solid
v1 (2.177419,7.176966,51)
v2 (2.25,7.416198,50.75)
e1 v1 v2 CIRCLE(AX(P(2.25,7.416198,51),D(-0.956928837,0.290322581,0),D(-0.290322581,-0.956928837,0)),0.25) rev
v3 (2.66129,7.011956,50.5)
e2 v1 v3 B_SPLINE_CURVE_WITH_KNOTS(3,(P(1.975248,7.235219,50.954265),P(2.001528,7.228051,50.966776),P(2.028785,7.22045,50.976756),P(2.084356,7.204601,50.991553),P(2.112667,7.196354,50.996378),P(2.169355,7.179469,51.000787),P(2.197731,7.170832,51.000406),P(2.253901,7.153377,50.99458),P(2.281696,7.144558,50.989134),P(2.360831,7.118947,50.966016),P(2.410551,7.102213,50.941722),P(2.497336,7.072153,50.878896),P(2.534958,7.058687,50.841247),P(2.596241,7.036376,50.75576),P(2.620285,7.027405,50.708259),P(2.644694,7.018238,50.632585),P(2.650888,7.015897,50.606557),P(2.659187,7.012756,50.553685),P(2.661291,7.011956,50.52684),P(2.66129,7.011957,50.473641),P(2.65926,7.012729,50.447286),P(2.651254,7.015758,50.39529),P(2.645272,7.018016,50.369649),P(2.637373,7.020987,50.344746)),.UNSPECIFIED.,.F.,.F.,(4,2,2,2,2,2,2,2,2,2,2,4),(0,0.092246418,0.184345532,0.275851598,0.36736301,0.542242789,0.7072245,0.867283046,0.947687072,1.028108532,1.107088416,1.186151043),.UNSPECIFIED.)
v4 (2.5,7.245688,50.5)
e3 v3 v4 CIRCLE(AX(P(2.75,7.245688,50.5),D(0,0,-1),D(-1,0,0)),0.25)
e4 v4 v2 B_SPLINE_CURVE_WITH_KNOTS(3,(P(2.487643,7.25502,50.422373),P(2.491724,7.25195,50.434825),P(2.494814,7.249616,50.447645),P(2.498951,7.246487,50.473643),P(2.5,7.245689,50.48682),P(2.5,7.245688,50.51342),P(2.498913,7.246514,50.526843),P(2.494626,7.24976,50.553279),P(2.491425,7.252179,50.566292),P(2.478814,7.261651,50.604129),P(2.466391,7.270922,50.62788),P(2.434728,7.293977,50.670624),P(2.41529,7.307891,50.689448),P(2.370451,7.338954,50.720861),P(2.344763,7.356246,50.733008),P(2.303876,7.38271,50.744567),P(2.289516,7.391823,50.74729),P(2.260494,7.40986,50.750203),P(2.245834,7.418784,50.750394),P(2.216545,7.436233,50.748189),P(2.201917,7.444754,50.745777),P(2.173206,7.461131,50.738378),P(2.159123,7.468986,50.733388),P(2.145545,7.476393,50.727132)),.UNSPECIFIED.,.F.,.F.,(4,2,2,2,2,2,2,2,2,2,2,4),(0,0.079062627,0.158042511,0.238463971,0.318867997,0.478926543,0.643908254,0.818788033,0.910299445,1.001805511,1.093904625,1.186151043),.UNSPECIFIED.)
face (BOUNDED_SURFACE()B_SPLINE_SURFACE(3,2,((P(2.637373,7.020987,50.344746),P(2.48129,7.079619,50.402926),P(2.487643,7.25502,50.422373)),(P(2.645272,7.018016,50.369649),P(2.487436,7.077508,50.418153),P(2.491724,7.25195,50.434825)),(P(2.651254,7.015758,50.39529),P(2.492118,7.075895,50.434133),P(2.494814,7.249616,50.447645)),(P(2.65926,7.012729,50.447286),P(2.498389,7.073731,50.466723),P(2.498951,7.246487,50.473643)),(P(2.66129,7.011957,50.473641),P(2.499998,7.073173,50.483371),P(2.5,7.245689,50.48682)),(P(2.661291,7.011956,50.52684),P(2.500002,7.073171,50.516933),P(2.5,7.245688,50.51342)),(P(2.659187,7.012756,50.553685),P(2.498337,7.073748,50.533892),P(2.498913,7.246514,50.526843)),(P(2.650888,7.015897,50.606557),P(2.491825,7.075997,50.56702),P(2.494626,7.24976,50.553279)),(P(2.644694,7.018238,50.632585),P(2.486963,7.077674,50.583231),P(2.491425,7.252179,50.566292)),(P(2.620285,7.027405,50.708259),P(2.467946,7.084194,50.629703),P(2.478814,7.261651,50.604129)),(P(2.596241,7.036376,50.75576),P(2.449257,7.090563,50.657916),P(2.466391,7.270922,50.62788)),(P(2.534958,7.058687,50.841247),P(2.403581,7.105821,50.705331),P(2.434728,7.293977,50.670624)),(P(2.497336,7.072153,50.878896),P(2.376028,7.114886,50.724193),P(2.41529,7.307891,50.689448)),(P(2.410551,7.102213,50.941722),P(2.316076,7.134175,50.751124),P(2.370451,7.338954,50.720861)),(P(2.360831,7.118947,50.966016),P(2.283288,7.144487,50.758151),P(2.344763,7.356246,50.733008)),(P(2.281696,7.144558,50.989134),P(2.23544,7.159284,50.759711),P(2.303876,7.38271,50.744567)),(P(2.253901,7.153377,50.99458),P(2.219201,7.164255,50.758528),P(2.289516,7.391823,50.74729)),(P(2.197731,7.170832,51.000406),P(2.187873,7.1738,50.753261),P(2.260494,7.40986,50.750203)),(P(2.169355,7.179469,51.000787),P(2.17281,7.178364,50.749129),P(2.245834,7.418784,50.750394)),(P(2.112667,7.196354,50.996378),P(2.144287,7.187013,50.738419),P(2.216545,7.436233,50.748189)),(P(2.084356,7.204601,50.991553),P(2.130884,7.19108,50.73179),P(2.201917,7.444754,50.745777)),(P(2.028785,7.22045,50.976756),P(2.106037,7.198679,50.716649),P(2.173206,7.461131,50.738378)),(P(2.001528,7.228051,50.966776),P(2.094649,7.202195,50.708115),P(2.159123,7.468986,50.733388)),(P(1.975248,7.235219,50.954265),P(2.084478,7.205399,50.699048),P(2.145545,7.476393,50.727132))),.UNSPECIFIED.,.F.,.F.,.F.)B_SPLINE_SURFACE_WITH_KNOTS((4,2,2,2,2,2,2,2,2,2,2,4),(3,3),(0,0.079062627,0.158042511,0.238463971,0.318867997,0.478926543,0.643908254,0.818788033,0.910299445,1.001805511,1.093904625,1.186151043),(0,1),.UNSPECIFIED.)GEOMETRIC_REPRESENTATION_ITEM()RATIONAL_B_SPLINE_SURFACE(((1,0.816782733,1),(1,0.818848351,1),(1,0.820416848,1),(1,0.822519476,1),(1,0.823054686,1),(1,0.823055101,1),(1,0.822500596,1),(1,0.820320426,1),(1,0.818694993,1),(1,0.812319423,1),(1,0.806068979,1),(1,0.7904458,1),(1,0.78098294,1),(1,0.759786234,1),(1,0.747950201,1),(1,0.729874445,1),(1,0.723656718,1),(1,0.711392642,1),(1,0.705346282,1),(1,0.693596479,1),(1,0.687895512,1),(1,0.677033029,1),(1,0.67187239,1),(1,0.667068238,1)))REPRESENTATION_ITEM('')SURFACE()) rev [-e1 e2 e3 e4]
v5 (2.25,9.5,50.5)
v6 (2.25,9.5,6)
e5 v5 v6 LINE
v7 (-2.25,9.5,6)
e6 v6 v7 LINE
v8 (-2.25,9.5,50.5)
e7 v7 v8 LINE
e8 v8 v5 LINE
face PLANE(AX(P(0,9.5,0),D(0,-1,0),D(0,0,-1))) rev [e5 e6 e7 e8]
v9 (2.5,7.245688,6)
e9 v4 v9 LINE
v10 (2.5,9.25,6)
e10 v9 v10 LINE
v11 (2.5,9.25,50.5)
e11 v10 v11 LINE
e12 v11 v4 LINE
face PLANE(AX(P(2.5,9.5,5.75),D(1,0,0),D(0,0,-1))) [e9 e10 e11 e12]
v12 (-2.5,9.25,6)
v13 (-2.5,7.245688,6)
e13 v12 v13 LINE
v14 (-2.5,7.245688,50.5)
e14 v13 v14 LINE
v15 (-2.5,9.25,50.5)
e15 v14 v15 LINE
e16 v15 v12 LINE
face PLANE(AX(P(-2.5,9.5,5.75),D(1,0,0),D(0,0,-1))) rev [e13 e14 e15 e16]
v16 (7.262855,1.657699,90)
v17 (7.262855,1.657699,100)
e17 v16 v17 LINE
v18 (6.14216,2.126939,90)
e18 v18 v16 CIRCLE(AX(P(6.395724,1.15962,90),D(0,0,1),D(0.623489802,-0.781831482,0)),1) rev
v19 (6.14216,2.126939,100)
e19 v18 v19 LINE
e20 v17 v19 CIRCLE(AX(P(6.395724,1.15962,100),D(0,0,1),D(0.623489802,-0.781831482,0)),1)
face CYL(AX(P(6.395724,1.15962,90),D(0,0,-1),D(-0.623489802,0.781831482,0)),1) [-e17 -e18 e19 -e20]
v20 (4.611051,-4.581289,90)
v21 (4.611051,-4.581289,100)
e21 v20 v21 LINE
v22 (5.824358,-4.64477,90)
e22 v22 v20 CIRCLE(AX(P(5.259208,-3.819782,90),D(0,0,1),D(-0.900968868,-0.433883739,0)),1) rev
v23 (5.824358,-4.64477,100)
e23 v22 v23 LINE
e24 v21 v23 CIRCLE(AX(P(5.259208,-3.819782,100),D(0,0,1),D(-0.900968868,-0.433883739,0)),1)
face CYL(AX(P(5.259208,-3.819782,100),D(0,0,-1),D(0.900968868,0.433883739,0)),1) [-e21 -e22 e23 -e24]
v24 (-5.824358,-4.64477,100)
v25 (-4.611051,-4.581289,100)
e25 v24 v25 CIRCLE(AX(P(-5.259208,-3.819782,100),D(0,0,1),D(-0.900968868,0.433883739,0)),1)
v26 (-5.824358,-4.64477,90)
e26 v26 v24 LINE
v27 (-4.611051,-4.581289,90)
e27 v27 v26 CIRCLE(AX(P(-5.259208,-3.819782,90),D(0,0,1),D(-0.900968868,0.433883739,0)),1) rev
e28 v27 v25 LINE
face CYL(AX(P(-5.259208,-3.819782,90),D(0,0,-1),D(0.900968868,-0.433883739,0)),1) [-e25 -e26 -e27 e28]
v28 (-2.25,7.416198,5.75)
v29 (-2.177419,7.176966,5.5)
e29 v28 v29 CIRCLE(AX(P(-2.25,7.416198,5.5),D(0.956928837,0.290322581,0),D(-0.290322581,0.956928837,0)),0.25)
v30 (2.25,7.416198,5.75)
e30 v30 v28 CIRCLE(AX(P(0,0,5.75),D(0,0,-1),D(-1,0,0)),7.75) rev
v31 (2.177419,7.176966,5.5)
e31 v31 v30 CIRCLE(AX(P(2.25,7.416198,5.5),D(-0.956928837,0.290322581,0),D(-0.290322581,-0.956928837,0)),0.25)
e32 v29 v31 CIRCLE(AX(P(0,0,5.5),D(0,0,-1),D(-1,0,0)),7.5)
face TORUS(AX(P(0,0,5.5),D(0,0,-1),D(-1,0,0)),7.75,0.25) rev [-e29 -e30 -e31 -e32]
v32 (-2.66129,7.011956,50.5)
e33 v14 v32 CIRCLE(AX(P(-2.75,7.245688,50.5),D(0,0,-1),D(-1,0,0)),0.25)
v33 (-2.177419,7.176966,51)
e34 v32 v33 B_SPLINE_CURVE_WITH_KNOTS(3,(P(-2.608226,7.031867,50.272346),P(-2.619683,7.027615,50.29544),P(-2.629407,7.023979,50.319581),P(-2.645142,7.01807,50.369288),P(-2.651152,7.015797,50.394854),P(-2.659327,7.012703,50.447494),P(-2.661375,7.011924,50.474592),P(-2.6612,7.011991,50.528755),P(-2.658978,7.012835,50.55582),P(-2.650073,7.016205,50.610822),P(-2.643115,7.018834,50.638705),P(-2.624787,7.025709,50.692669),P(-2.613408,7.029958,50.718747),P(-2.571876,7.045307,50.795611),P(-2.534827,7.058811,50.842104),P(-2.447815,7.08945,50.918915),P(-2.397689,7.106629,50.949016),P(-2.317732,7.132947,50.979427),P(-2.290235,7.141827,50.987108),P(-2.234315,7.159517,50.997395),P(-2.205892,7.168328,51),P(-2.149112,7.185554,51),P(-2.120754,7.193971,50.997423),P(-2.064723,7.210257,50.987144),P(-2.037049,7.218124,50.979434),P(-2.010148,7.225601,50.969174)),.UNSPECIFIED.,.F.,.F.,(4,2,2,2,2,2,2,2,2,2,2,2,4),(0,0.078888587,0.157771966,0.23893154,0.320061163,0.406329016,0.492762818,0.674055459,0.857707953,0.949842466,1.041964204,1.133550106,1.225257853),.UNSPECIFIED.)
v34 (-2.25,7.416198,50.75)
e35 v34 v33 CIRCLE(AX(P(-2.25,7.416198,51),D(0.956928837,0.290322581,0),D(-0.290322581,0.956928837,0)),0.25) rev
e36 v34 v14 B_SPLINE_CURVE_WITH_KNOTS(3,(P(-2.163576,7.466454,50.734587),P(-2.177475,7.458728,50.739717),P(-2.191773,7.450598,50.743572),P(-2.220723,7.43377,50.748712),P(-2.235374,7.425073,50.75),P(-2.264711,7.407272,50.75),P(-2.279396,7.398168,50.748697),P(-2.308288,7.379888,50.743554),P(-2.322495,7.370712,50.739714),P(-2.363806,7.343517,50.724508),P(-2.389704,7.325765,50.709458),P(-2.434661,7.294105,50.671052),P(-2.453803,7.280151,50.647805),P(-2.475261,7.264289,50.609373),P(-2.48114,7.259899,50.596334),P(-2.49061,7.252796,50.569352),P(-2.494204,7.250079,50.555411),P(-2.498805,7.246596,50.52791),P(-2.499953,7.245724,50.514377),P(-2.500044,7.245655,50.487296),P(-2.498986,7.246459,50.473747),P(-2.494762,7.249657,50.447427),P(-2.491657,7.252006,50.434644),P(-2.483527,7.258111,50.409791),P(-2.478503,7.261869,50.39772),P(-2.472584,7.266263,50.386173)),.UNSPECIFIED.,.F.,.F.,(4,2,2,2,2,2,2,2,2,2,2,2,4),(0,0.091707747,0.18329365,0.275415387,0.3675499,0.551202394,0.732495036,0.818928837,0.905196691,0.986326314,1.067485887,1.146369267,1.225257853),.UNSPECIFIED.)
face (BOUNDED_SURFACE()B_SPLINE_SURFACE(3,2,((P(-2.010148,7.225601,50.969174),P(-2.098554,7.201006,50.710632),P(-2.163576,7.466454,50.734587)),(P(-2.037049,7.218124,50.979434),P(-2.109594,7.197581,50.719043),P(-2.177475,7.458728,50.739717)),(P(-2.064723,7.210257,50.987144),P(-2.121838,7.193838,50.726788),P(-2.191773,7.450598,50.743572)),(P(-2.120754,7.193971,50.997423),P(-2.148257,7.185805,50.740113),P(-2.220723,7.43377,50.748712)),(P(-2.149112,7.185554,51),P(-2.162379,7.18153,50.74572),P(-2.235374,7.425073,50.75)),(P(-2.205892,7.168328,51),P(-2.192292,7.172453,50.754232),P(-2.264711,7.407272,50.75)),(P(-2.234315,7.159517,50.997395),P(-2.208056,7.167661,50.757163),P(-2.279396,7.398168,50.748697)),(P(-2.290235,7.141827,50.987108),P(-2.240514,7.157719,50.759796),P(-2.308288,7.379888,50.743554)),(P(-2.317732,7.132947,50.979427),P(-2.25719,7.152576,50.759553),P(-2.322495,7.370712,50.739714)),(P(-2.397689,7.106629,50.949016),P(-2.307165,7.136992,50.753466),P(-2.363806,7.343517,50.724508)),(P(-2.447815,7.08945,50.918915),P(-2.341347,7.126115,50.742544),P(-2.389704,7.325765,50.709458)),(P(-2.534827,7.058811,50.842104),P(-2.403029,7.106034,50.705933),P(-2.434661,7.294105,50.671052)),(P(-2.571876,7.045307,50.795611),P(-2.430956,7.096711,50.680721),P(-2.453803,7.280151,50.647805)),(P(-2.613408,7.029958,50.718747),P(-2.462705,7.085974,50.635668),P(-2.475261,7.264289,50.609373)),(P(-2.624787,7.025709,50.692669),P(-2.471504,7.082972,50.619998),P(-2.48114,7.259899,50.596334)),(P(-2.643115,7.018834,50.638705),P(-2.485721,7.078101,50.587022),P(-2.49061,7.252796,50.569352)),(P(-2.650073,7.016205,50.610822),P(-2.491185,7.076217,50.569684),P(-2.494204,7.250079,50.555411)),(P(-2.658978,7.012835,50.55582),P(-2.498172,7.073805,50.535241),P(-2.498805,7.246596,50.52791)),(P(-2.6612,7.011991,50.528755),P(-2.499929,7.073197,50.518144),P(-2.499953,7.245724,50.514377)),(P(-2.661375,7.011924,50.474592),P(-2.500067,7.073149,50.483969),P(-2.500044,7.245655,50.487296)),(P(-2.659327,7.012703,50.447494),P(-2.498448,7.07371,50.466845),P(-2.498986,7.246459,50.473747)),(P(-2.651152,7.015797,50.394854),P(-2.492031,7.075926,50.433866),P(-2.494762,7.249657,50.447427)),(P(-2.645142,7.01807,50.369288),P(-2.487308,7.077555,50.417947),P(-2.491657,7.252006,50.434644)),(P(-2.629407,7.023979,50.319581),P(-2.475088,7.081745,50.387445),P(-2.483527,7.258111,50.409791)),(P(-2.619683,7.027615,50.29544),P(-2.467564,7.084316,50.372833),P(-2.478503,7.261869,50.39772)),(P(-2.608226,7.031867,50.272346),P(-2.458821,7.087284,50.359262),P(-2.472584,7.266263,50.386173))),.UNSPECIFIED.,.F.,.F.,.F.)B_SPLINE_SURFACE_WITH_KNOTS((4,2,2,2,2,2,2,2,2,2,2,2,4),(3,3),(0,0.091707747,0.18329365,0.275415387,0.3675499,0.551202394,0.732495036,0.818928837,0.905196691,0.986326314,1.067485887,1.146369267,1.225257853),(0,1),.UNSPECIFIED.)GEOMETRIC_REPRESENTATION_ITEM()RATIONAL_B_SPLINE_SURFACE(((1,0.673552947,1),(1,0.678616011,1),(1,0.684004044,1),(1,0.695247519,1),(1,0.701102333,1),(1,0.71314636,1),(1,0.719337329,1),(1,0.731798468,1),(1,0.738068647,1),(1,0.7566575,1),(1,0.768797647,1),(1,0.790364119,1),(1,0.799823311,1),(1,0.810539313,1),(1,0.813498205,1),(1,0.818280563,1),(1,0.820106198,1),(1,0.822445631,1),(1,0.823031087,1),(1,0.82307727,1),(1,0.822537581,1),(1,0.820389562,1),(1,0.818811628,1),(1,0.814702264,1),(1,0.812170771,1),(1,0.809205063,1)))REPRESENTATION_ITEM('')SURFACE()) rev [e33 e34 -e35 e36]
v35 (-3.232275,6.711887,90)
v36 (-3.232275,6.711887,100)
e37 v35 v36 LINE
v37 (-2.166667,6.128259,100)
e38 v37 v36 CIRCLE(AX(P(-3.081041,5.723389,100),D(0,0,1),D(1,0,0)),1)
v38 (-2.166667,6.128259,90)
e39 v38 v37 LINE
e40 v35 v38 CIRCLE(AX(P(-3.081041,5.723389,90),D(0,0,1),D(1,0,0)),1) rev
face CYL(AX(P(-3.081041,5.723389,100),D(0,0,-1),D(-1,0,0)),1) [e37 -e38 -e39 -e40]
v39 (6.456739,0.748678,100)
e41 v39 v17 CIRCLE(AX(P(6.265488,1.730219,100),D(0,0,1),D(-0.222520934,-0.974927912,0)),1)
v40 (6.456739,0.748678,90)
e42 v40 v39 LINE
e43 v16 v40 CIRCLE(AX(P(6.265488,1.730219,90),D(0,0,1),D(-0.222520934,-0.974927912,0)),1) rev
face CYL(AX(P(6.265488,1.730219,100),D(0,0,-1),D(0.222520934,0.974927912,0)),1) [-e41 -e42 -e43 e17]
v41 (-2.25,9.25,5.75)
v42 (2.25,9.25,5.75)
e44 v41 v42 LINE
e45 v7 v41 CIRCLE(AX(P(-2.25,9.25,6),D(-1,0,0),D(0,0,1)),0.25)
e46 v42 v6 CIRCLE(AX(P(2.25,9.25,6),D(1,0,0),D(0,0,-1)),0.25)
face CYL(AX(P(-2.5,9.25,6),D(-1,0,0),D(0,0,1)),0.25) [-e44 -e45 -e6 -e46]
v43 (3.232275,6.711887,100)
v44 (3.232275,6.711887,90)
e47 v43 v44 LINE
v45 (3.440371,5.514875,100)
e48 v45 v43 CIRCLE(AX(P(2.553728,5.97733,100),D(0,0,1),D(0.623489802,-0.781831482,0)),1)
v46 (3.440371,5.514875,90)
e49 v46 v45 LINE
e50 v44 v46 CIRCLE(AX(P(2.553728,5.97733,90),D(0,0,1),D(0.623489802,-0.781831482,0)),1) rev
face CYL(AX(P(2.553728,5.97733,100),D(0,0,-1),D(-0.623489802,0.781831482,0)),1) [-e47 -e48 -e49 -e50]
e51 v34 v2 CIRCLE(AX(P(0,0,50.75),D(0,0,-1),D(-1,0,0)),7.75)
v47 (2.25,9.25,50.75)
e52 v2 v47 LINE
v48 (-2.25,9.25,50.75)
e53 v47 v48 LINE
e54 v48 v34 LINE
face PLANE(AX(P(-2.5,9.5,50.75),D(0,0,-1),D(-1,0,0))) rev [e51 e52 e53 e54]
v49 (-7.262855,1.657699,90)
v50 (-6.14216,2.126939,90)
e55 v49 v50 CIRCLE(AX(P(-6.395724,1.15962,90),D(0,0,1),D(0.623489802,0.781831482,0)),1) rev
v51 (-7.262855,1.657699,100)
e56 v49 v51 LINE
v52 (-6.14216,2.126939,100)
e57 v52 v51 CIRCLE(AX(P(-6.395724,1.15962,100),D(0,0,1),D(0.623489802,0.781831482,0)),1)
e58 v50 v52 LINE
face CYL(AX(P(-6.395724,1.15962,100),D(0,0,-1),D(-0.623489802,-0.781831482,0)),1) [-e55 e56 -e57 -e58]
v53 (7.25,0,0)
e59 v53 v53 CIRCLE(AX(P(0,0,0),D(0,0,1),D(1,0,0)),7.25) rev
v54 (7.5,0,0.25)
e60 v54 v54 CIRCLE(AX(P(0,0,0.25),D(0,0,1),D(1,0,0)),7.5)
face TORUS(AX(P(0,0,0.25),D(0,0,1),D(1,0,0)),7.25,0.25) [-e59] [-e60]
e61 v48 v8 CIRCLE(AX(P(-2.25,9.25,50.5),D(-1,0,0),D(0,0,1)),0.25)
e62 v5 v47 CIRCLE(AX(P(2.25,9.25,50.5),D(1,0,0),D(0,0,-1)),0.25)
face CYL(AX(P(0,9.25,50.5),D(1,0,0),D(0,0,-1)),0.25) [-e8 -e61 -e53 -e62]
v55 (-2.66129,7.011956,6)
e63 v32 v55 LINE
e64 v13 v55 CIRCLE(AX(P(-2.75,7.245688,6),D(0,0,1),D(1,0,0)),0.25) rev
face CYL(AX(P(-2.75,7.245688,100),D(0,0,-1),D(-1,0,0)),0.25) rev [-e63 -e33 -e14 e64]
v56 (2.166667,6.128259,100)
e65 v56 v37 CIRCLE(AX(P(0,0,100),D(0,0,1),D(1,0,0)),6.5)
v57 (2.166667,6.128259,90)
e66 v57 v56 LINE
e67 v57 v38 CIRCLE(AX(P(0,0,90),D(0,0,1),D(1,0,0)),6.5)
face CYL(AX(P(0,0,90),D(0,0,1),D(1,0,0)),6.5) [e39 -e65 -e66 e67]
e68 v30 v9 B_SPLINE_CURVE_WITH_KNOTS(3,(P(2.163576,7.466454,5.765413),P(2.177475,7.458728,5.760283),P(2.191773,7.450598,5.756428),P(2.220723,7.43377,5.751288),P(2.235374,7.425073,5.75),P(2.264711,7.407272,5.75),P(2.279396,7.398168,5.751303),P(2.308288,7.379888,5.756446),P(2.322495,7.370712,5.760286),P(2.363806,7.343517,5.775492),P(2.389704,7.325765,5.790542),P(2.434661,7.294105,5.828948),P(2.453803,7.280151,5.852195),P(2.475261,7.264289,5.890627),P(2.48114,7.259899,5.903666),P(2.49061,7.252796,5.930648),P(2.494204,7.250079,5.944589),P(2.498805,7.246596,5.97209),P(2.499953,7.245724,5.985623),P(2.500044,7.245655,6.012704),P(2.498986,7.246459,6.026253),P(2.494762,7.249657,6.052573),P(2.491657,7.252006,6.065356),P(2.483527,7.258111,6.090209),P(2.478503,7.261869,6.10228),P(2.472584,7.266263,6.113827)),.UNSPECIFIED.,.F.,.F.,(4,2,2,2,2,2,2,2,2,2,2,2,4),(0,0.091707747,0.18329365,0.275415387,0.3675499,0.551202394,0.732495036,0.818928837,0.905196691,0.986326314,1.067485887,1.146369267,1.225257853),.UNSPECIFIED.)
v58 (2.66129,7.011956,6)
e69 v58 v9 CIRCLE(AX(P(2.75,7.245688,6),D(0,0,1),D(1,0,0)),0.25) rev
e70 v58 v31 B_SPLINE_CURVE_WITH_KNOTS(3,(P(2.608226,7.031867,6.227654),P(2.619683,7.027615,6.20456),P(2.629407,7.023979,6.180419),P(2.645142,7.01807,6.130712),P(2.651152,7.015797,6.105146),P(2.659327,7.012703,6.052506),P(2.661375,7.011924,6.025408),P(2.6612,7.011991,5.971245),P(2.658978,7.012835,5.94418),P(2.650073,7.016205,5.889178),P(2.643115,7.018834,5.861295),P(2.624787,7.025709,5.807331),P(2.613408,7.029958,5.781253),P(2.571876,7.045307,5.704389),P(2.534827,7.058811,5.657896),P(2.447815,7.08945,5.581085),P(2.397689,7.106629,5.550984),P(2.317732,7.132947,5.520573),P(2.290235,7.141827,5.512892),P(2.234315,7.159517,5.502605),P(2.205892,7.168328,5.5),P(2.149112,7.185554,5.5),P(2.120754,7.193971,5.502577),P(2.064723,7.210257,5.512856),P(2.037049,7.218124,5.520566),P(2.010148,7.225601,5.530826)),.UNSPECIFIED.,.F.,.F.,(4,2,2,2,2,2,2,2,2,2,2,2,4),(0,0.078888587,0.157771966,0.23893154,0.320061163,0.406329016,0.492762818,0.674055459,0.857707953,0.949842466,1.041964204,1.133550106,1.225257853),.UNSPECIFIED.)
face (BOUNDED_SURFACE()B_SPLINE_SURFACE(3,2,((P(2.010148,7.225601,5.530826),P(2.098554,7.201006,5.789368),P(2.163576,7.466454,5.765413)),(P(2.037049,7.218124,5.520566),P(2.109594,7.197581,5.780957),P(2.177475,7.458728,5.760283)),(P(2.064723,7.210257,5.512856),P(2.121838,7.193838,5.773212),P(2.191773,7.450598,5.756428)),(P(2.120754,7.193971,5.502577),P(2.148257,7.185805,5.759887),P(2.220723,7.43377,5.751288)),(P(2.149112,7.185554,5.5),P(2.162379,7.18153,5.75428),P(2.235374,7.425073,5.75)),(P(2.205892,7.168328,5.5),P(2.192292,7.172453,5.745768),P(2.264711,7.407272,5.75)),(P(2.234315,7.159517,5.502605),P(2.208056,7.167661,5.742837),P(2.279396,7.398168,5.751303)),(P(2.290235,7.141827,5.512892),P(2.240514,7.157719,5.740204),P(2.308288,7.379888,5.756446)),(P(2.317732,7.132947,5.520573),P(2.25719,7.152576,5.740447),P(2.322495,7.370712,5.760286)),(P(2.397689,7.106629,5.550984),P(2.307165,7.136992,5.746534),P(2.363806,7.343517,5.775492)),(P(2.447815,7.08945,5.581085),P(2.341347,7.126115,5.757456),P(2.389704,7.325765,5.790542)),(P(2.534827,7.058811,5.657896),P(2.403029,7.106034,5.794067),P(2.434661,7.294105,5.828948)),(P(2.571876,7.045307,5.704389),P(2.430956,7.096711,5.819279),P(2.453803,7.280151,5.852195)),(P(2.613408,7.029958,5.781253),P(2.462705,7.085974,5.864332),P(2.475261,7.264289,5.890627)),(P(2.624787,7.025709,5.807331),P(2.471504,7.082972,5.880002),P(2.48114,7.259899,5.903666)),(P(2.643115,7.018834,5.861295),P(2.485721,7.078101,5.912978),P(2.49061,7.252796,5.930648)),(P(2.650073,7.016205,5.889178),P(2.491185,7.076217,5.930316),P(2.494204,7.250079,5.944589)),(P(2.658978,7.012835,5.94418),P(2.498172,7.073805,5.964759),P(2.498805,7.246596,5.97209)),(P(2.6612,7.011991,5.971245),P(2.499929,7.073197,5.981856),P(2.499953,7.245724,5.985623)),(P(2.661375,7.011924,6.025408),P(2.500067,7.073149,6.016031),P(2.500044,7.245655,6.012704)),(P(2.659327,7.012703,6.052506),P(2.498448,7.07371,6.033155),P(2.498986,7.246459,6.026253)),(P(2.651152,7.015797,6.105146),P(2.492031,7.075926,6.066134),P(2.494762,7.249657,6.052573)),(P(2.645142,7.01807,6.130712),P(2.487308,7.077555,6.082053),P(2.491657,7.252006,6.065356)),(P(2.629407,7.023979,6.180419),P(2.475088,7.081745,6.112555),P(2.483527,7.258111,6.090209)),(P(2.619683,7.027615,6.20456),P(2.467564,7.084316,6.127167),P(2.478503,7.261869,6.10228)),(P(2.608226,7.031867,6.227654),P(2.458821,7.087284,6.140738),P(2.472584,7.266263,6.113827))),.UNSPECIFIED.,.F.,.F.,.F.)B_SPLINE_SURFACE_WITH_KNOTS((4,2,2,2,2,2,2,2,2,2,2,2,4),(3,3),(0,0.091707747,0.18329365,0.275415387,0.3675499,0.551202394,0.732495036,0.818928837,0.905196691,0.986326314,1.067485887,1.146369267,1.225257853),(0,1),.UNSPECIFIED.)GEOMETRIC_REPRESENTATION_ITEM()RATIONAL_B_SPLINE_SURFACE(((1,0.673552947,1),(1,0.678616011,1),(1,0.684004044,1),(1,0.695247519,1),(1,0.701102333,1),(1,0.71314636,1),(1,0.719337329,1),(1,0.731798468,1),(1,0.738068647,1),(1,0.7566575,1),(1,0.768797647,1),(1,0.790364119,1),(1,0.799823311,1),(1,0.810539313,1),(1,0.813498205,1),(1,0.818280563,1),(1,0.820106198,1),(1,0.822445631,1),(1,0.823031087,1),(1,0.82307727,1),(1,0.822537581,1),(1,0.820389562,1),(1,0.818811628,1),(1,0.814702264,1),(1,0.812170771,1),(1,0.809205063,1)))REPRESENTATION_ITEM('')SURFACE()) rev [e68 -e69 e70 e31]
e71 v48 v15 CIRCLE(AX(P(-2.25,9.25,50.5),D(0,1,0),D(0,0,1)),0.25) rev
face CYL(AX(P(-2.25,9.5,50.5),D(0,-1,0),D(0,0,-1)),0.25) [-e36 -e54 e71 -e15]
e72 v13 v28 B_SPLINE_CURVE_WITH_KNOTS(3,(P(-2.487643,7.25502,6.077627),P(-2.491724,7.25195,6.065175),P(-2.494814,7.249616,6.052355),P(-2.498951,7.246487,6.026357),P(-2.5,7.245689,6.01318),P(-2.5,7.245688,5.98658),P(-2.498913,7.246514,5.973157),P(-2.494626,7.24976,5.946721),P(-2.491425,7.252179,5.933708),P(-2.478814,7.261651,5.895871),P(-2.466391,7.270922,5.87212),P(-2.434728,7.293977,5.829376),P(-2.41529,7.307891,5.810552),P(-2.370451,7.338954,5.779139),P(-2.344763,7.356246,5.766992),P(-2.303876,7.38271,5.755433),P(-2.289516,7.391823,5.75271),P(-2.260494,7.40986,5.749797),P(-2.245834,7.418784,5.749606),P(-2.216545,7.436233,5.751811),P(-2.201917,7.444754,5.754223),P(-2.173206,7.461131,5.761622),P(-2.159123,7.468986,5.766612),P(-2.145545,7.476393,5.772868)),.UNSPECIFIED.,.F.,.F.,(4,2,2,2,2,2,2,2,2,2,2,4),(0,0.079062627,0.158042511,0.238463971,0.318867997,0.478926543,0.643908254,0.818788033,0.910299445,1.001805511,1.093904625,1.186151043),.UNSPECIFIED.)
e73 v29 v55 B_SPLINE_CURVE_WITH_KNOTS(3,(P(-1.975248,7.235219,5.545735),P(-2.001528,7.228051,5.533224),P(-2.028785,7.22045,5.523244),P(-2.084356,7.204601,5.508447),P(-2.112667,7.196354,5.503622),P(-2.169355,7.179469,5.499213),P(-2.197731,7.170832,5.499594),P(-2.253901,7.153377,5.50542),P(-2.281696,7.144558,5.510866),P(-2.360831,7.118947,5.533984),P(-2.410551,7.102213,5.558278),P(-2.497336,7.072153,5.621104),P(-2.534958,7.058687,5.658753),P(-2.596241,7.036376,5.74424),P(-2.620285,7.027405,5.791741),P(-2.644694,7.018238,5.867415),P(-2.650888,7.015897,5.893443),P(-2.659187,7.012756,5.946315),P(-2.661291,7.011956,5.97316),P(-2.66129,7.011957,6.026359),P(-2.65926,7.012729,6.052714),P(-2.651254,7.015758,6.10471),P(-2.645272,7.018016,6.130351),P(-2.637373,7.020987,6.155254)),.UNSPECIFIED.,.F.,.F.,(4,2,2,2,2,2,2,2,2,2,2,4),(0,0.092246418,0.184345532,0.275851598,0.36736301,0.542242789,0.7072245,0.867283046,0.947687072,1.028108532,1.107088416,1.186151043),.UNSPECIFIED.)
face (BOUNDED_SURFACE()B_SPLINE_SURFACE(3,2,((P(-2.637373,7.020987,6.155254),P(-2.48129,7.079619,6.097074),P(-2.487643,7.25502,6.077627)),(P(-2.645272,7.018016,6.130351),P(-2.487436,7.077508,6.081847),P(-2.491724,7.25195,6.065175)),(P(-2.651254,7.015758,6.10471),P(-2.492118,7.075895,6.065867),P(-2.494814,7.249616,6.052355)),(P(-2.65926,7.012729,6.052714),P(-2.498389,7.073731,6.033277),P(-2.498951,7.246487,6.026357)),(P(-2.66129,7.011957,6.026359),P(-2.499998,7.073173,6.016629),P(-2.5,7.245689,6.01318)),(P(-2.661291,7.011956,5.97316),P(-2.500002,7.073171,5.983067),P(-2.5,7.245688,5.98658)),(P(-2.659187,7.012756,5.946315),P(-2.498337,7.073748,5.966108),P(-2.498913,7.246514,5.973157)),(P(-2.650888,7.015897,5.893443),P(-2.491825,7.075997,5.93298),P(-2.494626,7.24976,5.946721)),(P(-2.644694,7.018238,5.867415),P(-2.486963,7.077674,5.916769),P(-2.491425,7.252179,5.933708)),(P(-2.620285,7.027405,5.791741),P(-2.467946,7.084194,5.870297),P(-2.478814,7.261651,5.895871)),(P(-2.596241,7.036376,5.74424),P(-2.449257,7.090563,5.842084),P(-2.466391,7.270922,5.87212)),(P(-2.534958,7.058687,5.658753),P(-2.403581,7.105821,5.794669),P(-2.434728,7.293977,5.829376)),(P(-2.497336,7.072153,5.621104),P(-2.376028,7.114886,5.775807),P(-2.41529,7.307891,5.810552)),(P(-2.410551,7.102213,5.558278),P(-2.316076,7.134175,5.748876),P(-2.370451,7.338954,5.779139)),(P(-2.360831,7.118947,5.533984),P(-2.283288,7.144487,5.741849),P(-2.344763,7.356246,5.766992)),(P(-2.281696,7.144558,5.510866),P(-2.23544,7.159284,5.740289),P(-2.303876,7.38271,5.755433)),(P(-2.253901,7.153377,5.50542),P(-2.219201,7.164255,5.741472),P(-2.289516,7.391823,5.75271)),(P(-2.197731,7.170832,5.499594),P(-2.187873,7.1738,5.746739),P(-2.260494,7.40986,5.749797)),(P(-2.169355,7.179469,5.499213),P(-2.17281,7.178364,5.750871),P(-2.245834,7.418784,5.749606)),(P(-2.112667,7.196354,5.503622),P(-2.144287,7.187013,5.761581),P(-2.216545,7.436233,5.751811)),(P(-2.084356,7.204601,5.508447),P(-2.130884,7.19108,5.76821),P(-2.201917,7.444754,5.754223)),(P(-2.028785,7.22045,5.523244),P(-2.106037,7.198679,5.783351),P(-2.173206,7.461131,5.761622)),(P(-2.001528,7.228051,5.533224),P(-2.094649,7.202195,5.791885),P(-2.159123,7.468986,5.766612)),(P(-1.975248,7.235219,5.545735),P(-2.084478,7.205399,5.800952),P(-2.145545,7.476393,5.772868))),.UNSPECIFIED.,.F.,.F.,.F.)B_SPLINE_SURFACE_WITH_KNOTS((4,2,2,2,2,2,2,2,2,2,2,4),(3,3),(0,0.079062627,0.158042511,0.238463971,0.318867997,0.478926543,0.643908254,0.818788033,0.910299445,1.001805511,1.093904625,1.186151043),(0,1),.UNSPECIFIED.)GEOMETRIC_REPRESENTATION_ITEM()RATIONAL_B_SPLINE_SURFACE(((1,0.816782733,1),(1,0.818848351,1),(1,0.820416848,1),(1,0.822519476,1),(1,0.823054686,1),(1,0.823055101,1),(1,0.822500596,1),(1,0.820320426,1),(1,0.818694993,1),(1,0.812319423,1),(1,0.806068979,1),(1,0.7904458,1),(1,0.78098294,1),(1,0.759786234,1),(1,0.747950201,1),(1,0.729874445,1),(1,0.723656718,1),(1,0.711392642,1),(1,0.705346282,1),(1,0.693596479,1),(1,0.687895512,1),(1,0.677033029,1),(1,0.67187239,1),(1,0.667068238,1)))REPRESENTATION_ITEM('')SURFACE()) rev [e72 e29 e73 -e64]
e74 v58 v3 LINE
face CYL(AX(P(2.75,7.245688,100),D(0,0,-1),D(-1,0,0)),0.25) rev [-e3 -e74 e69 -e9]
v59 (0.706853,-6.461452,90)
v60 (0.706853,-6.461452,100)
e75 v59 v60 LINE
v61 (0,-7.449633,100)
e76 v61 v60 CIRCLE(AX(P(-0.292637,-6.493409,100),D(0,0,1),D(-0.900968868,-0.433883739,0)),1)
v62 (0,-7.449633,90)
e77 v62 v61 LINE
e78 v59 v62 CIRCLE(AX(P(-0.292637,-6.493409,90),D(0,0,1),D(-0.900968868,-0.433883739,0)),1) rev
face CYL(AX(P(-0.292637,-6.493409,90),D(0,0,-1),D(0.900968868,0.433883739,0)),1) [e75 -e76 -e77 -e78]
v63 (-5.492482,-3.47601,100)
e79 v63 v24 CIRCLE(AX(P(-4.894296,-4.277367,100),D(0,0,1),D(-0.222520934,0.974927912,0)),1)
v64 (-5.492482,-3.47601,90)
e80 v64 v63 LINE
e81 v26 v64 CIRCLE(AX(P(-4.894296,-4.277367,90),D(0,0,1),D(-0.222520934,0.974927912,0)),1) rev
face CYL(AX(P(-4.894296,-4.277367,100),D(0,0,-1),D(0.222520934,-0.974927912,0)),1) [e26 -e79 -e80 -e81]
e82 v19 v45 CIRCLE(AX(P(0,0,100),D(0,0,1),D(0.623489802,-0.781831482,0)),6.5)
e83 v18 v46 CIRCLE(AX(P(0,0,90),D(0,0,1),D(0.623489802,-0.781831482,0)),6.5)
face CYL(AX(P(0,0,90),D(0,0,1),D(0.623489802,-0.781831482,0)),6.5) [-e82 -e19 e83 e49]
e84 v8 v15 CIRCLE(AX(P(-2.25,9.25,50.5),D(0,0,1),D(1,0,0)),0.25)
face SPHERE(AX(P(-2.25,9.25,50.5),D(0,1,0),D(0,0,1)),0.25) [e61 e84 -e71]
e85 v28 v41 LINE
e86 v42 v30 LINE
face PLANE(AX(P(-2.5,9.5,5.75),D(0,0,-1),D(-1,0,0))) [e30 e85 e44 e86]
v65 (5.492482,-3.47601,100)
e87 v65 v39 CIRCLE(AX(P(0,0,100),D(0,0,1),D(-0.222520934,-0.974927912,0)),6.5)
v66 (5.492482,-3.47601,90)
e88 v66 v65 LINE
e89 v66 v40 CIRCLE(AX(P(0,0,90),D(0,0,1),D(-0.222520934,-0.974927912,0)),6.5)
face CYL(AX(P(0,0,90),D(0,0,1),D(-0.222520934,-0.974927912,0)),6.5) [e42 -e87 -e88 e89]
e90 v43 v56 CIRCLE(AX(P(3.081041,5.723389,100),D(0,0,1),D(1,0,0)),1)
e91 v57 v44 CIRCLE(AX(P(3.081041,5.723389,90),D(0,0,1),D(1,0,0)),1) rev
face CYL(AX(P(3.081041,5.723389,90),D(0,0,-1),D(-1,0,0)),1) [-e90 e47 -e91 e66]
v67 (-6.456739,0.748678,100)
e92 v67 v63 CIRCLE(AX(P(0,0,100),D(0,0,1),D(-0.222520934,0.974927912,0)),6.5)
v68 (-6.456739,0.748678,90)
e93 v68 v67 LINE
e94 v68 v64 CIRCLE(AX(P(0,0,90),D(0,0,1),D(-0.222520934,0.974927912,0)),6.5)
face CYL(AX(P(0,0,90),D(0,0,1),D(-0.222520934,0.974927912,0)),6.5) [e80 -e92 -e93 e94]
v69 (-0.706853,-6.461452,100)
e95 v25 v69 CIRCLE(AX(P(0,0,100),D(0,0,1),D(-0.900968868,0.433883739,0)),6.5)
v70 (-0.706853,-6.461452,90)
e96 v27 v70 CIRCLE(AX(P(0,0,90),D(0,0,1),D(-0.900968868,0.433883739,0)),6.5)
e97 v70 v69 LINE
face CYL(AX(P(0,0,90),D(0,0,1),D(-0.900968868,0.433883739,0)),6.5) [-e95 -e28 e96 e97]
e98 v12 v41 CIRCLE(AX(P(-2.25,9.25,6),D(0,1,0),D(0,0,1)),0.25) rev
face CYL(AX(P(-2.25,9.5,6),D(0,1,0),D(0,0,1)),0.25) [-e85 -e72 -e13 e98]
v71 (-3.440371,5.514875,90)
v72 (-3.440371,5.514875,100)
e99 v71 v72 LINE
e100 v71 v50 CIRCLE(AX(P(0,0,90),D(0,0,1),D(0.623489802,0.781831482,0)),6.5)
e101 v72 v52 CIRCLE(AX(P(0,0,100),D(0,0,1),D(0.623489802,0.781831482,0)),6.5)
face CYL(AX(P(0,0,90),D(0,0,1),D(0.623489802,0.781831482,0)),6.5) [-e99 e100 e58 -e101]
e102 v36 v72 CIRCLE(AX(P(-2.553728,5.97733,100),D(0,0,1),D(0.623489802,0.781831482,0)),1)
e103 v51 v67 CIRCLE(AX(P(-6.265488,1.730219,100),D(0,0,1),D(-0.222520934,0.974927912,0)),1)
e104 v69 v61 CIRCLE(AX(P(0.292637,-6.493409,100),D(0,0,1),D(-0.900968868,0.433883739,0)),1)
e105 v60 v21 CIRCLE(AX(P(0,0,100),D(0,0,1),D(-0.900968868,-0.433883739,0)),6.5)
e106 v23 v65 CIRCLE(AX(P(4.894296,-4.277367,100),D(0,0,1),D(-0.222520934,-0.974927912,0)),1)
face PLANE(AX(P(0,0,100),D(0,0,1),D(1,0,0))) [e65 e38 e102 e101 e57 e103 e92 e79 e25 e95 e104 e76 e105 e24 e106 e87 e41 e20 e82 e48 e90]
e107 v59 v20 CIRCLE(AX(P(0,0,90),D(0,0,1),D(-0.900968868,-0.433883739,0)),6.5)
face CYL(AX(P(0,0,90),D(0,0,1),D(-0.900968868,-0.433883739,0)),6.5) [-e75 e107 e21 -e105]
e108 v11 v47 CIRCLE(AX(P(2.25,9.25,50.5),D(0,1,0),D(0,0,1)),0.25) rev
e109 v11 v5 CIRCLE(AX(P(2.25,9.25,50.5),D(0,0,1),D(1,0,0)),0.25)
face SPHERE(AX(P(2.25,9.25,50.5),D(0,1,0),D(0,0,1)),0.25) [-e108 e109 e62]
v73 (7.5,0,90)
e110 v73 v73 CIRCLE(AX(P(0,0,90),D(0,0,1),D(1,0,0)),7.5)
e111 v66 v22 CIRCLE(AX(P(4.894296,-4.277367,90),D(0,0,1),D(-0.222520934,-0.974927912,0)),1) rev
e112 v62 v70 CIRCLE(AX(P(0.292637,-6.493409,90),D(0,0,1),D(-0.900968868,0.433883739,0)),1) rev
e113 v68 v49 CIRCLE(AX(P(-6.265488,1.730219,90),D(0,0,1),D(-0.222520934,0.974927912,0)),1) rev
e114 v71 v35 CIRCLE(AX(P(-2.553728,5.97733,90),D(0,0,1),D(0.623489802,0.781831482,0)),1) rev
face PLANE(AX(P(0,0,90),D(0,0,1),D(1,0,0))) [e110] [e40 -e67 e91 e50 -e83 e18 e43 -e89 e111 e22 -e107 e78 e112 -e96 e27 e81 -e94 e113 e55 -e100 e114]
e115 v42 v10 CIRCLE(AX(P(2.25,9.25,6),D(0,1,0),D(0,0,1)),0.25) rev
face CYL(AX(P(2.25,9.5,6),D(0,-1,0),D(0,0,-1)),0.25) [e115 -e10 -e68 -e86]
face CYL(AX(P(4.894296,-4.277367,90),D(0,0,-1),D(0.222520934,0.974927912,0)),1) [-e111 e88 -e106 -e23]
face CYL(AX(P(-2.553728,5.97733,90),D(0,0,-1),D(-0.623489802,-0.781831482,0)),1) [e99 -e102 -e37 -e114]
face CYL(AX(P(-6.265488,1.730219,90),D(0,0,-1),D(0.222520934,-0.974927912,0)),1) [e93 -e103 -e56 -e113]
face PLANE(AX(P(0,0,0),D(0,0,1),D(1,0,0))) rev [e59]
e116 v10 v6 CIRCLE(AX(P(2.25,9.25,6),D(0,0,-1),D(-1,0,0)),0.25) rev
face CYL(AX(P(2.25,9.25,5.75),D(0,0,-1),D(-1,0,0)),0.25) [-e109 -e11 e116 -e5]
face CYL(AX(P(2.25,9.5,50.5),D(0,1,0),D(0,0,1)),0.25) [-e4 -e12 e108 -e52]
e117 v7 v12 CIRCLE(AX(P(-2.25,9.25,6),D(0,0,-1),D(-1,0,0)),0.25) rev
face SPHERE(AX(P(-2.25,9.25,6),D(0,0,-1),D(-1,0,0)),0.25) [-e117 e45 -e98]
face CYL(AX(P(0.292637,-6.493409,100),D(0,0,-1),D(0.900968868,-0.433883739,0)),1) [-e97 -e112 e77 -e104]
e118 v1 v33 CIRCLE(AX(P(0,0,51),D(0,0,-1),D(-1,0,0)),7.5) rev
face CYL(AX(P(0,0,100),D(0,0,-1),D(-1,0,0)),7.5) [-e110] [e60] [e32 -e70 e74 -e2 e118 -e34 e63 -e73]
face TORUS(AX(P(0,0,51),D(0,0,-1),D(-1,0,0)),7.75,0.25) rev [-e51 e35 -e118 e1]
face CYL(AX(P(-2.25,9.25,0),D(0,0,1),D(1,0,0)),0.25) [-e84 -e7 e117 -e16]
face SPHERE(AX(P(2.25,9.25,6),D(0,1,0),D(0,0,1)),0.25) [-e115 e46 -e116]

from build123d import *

# Parameters (mm, degrees)
SKETCH1_R                = 7.5
BOSS_EXTRUDE1_DEPTH      = 100
SKETCH2_W                = 5
SKETCH2_H                = 45
BOSS_EXTRUDE3_DEPTH      = 9.5
CUT_EXTRUDE1_START       = -10
CUT_EXTRUDE1_DEPTH       = 10
FILLET1_R                = 1
CIRPATTERN8_COUNT        = 7
FILLET1_OF_CIRPATTERN8_R = 1
FILLET3_R                = 0.25


with BuildPart() as part:
    # Sketch1 → Boss-Extrude1 (new body)
    with BuildSketch(Plane.XY):
        Circle(SKETCH1_R)
    extrude(amount=BOSS_EXTRUDE1_DEPTH)

    # Sketch2 → Boss-Extrude3 (add)
    with BuildSketch(Plane(origin=(0, 0, 0), x_dir=(1, 0, 0), z_dir=(0, 1, 0))):
        with Locations((0, -28.25)):
            Rectangle(SKETCH2_W, SKETCH2_H)
    extrude(amount=BOSS_EXTRUDE3_DEPTH)

    # Sketch3 → Cut-Extrude1 (cut)
    with BuildSketch(Plane.XY.offset(100).offset(CUT_EXTRUDE1_START)):
        with BuildLine():
            ThreePointArc((2.5, 7.071067812), (0, 7.5), (-2.5, 7.071067812))
            Line((-2.5, 7.071067812), (-2.166666667, 6.12825877))
            ThreePointArc((-2.166666667, 6.12825877), (0, 6.5), (2.166666667, 6.12825877))
            Line((2.166666667, 6.12825877), (2.5, 7.071067812))
        make_face()
    cut_extrude1 = extrude(amount=CUT_EXTRUDE1_DEPTH, mode=Mode.SUBTRACT)

    # Fillet1
    # the kernel refuses this fillet: 1 mm, written as the material it takes off along each edge
    with BuildSketch(Plane(origin=(2.5, 7.071067812, 90), x_dir=(0.9143745015294013, -0.4048694492708226, 0), z_dir=(0, 0, 1))) as fillet1_piece_1:
        with BuildLine():
            CenterArc((1.076923077, -0.997037031), FILLET1_R, 85.588274214, 94.411725786)
            Line((0.076923077, -0.997037031), (0.056923077, -0.997037031))
            ThreePointArc((0.056923077, -0.997037031), (0.018520798, -0.500056977), (-0.019940741, -0.001538462))
            Line((-0.019940741, -0.001538462), (-0.001538462, 0.019940741))
            ThreePointArc((-0.001538462, 0.019940741), (0.576923077, 0.042222271), (1.155384615, 0.019940741))
            Line((1.155384615, 0.019940741), (1.153846154, 0))
        make_face()
    extrude(amount=12.884615385, mode=Mode.SUBTRACT)
    with BuildSketch(Plane(origin=(-2.5, 7.071067812, 90), x_dir=(-0.9143745015294016, -0.40486944927082136, 0), z_dir=(0, 0, 1))) as fillet1_piece_2:
        with BuildLine():
            CenterArc((1.076923077, 0.997037031), FILLET1_R, 180, 94.411725786)
            Line((0.076923077, 0.997037031), (0.056923077, 0.997037031))
            ThreePointArc((0.056923077, 0.997037031), (0.018520798, 0.500056977), (-0.019940741, 0.001538462))
            Line((-0.019940741, 0.001538462), (-0.001538462, -0.019940741))
            ThreePointArc((-0.001538462, -0.019940741), (0.576923077, -0.042222271), (1.155384615, -0.019940741))
            Line((1.155384615, -0.019940741), (1.153846154, 0))
        make_face()
    extrude(amount=12.884615385, mode=Mode.SUBTRACT)

    # CirPattern8: Cut-Extrude1 ×7 about axis
    cirpattern8_axis = Axis((0, 0, 0), (0, 0, 1))
    for i in range(1, CIRPATTERN8_COUNT):
        add(cut_extrude1.rotate(cirpattern8_axis, i * 360 / CIRPATTERN8_COUNT), mode=Mode.SUBTRACT)

    # Fillet1 of CirPattern8
    # the kernel refuses this fillet: 1 mm, written as the material it takes off along each edge
    with BuildSketch(Plane(origin=(-3.969658925, 6.363317375, 90), x_dir=(0.8866428585126668, 0.4624547993571771, 0), z_dir=(0, 0, 1)), Plane(origin=(-7.450083714, 0.863859167, 90), x_dir=(0.19125105881764654, 0.9815411517104767, 0), z_dir=(0, 0, 1)), Plane(origin=(-5.320443512, -5.286102614, 90), x_dir=(-0.6481566889776921, 0.7615069970351391, 0), z_dir=(0, 0, 1)), Plane(origin=(0.815599172, -7.455521309, 90), x_dir=(-0.9994892299858744, -0.031957458319521785, 0), z_dir=(0, 0, 1)), Plane(origin=(6.337479044, -4.010780394, 90), x_dir=(-0.5981859949499692, -0.8013572957462329, 0), z_dir=(0, 0, 1)), Plane(origin=(7.087107935, 2.454159963, 90), x_dir=(0.25356349505382336, -0.9673187447662169, 0), z_dir=(0, 0, 1))) as fillet1_of_cirpattern8_piece_1:
        with BuildLine():
            CenterArc((1.076923077, -0.997037031), FILLET1_OF_CIRPATTERN8_R, 85.588274214, 94.411725786)
            Line((0.076923077, -0.997037031), (0.056923077, -0.997037031))
            ThreePointArc((0.056923077, -0.997037031), (0.018520798, -0.500056977), (-0.019940741, -0.001538462))
            Line((-0.019940741, -0.001538462), (-0.001538462, 0.019940741))
            ThreePointArc((-0.001538462, 0.019940741), (0.576923077, 0.042222271), (1.155384615, 0.019940741))
            Line((1.155384615, 0.019940741), (1.153846154, 0))
        make_face()
    extrude(amount=12.884615385, mode=Mode.SUBTRACT)
    with BuildSketch(Plane(origin=(-7.087107935, 2.454159963, 90), x_dir=(-0.25356349505382375, -0.9673187447662169, 0), z_dir=(0, 0, 1)), Plane(origin=(-6.337479044, -4.010780394, 90), x_dir=(0.5981859949499683, -0.8013572957462336, 0), z_dir=(0, 0, 1)), Plane(origin=(-0.815599172, -7.455521309, 90), x_dir=(0.9994892299858742, -0.03195745831952264, 0), z_dir=(0, 0, 1)), Plane(origin=(5.320443512, -5.286102614, 90), x_dir=(0.6481566889776939, 0.7615069970351375, 0), z_dir=(0, 0, 1)), Plane(origin=(7.450083714, 0.863859167, 90), x_dir=(-0.1912510588176455, 0.981541151710477, 0), z_dir=(0, 0, 1)), Plane(origin=(3.969658925, 6.363317375, 90), x_dir=(-0.8866428585126658, 0.46245479935717904, 0), z_dir=(0, 0, 1))) as fillet1_of_cirpattern8_piece_2:
        with BuildLine():
            CenterArc((1.076923077, 0.997037031), FILLET1_OF_CIRPATTERN8_R, 180, 94.411725786)
            Line((0.076923077, 0.997037031), (0.056923077, 0.997037031))
            ThreePointArc((0.056923077, 0.997037031), (0.018520798, 0.500056977), (-0.019940741, 0.001538462))
            Line((-0.019940741, 0.001538462), (-0.001538462, -0.019940741))
            ThreePointArc((-0.001538462, -0.019940741), (0.576923077, -0.042222271), (1.155384615, -0.019940741))
            Line((1.155384615, -0.019940741), (1.153846154, 0))
        make_face()
    extrude(amount=12.884615385, mode=Mode.SUBTRACT)

    # Fillet3
    fillet3_edges = [part.edges().sort_by_distance(p)[0] for p in [
        (0, 9.5, 50.75),
        (-2.5, 9.5, 28.25),
        (-7.5, 0, 0),
        (-2.5, 7.071067812, 28.25),
        (0, 7.5, 5.75),
        (2.5, 7.071067812, 28.25),
        (0, 7.5, 50.75),
        (2.5, 9.5, 28.25),
        (2.5, 8.285533906, 50.75),
        (-2.5, 8.285533906, 5.75),
        (-2.5, 8.285533906, 50.75),
        (0, 9.5, 5.75),
        (2.5, 8.285533906, 5.75),
    ]]
    fillet(fillet3_edges, radius=FILLET3_R)


solid = part.part
